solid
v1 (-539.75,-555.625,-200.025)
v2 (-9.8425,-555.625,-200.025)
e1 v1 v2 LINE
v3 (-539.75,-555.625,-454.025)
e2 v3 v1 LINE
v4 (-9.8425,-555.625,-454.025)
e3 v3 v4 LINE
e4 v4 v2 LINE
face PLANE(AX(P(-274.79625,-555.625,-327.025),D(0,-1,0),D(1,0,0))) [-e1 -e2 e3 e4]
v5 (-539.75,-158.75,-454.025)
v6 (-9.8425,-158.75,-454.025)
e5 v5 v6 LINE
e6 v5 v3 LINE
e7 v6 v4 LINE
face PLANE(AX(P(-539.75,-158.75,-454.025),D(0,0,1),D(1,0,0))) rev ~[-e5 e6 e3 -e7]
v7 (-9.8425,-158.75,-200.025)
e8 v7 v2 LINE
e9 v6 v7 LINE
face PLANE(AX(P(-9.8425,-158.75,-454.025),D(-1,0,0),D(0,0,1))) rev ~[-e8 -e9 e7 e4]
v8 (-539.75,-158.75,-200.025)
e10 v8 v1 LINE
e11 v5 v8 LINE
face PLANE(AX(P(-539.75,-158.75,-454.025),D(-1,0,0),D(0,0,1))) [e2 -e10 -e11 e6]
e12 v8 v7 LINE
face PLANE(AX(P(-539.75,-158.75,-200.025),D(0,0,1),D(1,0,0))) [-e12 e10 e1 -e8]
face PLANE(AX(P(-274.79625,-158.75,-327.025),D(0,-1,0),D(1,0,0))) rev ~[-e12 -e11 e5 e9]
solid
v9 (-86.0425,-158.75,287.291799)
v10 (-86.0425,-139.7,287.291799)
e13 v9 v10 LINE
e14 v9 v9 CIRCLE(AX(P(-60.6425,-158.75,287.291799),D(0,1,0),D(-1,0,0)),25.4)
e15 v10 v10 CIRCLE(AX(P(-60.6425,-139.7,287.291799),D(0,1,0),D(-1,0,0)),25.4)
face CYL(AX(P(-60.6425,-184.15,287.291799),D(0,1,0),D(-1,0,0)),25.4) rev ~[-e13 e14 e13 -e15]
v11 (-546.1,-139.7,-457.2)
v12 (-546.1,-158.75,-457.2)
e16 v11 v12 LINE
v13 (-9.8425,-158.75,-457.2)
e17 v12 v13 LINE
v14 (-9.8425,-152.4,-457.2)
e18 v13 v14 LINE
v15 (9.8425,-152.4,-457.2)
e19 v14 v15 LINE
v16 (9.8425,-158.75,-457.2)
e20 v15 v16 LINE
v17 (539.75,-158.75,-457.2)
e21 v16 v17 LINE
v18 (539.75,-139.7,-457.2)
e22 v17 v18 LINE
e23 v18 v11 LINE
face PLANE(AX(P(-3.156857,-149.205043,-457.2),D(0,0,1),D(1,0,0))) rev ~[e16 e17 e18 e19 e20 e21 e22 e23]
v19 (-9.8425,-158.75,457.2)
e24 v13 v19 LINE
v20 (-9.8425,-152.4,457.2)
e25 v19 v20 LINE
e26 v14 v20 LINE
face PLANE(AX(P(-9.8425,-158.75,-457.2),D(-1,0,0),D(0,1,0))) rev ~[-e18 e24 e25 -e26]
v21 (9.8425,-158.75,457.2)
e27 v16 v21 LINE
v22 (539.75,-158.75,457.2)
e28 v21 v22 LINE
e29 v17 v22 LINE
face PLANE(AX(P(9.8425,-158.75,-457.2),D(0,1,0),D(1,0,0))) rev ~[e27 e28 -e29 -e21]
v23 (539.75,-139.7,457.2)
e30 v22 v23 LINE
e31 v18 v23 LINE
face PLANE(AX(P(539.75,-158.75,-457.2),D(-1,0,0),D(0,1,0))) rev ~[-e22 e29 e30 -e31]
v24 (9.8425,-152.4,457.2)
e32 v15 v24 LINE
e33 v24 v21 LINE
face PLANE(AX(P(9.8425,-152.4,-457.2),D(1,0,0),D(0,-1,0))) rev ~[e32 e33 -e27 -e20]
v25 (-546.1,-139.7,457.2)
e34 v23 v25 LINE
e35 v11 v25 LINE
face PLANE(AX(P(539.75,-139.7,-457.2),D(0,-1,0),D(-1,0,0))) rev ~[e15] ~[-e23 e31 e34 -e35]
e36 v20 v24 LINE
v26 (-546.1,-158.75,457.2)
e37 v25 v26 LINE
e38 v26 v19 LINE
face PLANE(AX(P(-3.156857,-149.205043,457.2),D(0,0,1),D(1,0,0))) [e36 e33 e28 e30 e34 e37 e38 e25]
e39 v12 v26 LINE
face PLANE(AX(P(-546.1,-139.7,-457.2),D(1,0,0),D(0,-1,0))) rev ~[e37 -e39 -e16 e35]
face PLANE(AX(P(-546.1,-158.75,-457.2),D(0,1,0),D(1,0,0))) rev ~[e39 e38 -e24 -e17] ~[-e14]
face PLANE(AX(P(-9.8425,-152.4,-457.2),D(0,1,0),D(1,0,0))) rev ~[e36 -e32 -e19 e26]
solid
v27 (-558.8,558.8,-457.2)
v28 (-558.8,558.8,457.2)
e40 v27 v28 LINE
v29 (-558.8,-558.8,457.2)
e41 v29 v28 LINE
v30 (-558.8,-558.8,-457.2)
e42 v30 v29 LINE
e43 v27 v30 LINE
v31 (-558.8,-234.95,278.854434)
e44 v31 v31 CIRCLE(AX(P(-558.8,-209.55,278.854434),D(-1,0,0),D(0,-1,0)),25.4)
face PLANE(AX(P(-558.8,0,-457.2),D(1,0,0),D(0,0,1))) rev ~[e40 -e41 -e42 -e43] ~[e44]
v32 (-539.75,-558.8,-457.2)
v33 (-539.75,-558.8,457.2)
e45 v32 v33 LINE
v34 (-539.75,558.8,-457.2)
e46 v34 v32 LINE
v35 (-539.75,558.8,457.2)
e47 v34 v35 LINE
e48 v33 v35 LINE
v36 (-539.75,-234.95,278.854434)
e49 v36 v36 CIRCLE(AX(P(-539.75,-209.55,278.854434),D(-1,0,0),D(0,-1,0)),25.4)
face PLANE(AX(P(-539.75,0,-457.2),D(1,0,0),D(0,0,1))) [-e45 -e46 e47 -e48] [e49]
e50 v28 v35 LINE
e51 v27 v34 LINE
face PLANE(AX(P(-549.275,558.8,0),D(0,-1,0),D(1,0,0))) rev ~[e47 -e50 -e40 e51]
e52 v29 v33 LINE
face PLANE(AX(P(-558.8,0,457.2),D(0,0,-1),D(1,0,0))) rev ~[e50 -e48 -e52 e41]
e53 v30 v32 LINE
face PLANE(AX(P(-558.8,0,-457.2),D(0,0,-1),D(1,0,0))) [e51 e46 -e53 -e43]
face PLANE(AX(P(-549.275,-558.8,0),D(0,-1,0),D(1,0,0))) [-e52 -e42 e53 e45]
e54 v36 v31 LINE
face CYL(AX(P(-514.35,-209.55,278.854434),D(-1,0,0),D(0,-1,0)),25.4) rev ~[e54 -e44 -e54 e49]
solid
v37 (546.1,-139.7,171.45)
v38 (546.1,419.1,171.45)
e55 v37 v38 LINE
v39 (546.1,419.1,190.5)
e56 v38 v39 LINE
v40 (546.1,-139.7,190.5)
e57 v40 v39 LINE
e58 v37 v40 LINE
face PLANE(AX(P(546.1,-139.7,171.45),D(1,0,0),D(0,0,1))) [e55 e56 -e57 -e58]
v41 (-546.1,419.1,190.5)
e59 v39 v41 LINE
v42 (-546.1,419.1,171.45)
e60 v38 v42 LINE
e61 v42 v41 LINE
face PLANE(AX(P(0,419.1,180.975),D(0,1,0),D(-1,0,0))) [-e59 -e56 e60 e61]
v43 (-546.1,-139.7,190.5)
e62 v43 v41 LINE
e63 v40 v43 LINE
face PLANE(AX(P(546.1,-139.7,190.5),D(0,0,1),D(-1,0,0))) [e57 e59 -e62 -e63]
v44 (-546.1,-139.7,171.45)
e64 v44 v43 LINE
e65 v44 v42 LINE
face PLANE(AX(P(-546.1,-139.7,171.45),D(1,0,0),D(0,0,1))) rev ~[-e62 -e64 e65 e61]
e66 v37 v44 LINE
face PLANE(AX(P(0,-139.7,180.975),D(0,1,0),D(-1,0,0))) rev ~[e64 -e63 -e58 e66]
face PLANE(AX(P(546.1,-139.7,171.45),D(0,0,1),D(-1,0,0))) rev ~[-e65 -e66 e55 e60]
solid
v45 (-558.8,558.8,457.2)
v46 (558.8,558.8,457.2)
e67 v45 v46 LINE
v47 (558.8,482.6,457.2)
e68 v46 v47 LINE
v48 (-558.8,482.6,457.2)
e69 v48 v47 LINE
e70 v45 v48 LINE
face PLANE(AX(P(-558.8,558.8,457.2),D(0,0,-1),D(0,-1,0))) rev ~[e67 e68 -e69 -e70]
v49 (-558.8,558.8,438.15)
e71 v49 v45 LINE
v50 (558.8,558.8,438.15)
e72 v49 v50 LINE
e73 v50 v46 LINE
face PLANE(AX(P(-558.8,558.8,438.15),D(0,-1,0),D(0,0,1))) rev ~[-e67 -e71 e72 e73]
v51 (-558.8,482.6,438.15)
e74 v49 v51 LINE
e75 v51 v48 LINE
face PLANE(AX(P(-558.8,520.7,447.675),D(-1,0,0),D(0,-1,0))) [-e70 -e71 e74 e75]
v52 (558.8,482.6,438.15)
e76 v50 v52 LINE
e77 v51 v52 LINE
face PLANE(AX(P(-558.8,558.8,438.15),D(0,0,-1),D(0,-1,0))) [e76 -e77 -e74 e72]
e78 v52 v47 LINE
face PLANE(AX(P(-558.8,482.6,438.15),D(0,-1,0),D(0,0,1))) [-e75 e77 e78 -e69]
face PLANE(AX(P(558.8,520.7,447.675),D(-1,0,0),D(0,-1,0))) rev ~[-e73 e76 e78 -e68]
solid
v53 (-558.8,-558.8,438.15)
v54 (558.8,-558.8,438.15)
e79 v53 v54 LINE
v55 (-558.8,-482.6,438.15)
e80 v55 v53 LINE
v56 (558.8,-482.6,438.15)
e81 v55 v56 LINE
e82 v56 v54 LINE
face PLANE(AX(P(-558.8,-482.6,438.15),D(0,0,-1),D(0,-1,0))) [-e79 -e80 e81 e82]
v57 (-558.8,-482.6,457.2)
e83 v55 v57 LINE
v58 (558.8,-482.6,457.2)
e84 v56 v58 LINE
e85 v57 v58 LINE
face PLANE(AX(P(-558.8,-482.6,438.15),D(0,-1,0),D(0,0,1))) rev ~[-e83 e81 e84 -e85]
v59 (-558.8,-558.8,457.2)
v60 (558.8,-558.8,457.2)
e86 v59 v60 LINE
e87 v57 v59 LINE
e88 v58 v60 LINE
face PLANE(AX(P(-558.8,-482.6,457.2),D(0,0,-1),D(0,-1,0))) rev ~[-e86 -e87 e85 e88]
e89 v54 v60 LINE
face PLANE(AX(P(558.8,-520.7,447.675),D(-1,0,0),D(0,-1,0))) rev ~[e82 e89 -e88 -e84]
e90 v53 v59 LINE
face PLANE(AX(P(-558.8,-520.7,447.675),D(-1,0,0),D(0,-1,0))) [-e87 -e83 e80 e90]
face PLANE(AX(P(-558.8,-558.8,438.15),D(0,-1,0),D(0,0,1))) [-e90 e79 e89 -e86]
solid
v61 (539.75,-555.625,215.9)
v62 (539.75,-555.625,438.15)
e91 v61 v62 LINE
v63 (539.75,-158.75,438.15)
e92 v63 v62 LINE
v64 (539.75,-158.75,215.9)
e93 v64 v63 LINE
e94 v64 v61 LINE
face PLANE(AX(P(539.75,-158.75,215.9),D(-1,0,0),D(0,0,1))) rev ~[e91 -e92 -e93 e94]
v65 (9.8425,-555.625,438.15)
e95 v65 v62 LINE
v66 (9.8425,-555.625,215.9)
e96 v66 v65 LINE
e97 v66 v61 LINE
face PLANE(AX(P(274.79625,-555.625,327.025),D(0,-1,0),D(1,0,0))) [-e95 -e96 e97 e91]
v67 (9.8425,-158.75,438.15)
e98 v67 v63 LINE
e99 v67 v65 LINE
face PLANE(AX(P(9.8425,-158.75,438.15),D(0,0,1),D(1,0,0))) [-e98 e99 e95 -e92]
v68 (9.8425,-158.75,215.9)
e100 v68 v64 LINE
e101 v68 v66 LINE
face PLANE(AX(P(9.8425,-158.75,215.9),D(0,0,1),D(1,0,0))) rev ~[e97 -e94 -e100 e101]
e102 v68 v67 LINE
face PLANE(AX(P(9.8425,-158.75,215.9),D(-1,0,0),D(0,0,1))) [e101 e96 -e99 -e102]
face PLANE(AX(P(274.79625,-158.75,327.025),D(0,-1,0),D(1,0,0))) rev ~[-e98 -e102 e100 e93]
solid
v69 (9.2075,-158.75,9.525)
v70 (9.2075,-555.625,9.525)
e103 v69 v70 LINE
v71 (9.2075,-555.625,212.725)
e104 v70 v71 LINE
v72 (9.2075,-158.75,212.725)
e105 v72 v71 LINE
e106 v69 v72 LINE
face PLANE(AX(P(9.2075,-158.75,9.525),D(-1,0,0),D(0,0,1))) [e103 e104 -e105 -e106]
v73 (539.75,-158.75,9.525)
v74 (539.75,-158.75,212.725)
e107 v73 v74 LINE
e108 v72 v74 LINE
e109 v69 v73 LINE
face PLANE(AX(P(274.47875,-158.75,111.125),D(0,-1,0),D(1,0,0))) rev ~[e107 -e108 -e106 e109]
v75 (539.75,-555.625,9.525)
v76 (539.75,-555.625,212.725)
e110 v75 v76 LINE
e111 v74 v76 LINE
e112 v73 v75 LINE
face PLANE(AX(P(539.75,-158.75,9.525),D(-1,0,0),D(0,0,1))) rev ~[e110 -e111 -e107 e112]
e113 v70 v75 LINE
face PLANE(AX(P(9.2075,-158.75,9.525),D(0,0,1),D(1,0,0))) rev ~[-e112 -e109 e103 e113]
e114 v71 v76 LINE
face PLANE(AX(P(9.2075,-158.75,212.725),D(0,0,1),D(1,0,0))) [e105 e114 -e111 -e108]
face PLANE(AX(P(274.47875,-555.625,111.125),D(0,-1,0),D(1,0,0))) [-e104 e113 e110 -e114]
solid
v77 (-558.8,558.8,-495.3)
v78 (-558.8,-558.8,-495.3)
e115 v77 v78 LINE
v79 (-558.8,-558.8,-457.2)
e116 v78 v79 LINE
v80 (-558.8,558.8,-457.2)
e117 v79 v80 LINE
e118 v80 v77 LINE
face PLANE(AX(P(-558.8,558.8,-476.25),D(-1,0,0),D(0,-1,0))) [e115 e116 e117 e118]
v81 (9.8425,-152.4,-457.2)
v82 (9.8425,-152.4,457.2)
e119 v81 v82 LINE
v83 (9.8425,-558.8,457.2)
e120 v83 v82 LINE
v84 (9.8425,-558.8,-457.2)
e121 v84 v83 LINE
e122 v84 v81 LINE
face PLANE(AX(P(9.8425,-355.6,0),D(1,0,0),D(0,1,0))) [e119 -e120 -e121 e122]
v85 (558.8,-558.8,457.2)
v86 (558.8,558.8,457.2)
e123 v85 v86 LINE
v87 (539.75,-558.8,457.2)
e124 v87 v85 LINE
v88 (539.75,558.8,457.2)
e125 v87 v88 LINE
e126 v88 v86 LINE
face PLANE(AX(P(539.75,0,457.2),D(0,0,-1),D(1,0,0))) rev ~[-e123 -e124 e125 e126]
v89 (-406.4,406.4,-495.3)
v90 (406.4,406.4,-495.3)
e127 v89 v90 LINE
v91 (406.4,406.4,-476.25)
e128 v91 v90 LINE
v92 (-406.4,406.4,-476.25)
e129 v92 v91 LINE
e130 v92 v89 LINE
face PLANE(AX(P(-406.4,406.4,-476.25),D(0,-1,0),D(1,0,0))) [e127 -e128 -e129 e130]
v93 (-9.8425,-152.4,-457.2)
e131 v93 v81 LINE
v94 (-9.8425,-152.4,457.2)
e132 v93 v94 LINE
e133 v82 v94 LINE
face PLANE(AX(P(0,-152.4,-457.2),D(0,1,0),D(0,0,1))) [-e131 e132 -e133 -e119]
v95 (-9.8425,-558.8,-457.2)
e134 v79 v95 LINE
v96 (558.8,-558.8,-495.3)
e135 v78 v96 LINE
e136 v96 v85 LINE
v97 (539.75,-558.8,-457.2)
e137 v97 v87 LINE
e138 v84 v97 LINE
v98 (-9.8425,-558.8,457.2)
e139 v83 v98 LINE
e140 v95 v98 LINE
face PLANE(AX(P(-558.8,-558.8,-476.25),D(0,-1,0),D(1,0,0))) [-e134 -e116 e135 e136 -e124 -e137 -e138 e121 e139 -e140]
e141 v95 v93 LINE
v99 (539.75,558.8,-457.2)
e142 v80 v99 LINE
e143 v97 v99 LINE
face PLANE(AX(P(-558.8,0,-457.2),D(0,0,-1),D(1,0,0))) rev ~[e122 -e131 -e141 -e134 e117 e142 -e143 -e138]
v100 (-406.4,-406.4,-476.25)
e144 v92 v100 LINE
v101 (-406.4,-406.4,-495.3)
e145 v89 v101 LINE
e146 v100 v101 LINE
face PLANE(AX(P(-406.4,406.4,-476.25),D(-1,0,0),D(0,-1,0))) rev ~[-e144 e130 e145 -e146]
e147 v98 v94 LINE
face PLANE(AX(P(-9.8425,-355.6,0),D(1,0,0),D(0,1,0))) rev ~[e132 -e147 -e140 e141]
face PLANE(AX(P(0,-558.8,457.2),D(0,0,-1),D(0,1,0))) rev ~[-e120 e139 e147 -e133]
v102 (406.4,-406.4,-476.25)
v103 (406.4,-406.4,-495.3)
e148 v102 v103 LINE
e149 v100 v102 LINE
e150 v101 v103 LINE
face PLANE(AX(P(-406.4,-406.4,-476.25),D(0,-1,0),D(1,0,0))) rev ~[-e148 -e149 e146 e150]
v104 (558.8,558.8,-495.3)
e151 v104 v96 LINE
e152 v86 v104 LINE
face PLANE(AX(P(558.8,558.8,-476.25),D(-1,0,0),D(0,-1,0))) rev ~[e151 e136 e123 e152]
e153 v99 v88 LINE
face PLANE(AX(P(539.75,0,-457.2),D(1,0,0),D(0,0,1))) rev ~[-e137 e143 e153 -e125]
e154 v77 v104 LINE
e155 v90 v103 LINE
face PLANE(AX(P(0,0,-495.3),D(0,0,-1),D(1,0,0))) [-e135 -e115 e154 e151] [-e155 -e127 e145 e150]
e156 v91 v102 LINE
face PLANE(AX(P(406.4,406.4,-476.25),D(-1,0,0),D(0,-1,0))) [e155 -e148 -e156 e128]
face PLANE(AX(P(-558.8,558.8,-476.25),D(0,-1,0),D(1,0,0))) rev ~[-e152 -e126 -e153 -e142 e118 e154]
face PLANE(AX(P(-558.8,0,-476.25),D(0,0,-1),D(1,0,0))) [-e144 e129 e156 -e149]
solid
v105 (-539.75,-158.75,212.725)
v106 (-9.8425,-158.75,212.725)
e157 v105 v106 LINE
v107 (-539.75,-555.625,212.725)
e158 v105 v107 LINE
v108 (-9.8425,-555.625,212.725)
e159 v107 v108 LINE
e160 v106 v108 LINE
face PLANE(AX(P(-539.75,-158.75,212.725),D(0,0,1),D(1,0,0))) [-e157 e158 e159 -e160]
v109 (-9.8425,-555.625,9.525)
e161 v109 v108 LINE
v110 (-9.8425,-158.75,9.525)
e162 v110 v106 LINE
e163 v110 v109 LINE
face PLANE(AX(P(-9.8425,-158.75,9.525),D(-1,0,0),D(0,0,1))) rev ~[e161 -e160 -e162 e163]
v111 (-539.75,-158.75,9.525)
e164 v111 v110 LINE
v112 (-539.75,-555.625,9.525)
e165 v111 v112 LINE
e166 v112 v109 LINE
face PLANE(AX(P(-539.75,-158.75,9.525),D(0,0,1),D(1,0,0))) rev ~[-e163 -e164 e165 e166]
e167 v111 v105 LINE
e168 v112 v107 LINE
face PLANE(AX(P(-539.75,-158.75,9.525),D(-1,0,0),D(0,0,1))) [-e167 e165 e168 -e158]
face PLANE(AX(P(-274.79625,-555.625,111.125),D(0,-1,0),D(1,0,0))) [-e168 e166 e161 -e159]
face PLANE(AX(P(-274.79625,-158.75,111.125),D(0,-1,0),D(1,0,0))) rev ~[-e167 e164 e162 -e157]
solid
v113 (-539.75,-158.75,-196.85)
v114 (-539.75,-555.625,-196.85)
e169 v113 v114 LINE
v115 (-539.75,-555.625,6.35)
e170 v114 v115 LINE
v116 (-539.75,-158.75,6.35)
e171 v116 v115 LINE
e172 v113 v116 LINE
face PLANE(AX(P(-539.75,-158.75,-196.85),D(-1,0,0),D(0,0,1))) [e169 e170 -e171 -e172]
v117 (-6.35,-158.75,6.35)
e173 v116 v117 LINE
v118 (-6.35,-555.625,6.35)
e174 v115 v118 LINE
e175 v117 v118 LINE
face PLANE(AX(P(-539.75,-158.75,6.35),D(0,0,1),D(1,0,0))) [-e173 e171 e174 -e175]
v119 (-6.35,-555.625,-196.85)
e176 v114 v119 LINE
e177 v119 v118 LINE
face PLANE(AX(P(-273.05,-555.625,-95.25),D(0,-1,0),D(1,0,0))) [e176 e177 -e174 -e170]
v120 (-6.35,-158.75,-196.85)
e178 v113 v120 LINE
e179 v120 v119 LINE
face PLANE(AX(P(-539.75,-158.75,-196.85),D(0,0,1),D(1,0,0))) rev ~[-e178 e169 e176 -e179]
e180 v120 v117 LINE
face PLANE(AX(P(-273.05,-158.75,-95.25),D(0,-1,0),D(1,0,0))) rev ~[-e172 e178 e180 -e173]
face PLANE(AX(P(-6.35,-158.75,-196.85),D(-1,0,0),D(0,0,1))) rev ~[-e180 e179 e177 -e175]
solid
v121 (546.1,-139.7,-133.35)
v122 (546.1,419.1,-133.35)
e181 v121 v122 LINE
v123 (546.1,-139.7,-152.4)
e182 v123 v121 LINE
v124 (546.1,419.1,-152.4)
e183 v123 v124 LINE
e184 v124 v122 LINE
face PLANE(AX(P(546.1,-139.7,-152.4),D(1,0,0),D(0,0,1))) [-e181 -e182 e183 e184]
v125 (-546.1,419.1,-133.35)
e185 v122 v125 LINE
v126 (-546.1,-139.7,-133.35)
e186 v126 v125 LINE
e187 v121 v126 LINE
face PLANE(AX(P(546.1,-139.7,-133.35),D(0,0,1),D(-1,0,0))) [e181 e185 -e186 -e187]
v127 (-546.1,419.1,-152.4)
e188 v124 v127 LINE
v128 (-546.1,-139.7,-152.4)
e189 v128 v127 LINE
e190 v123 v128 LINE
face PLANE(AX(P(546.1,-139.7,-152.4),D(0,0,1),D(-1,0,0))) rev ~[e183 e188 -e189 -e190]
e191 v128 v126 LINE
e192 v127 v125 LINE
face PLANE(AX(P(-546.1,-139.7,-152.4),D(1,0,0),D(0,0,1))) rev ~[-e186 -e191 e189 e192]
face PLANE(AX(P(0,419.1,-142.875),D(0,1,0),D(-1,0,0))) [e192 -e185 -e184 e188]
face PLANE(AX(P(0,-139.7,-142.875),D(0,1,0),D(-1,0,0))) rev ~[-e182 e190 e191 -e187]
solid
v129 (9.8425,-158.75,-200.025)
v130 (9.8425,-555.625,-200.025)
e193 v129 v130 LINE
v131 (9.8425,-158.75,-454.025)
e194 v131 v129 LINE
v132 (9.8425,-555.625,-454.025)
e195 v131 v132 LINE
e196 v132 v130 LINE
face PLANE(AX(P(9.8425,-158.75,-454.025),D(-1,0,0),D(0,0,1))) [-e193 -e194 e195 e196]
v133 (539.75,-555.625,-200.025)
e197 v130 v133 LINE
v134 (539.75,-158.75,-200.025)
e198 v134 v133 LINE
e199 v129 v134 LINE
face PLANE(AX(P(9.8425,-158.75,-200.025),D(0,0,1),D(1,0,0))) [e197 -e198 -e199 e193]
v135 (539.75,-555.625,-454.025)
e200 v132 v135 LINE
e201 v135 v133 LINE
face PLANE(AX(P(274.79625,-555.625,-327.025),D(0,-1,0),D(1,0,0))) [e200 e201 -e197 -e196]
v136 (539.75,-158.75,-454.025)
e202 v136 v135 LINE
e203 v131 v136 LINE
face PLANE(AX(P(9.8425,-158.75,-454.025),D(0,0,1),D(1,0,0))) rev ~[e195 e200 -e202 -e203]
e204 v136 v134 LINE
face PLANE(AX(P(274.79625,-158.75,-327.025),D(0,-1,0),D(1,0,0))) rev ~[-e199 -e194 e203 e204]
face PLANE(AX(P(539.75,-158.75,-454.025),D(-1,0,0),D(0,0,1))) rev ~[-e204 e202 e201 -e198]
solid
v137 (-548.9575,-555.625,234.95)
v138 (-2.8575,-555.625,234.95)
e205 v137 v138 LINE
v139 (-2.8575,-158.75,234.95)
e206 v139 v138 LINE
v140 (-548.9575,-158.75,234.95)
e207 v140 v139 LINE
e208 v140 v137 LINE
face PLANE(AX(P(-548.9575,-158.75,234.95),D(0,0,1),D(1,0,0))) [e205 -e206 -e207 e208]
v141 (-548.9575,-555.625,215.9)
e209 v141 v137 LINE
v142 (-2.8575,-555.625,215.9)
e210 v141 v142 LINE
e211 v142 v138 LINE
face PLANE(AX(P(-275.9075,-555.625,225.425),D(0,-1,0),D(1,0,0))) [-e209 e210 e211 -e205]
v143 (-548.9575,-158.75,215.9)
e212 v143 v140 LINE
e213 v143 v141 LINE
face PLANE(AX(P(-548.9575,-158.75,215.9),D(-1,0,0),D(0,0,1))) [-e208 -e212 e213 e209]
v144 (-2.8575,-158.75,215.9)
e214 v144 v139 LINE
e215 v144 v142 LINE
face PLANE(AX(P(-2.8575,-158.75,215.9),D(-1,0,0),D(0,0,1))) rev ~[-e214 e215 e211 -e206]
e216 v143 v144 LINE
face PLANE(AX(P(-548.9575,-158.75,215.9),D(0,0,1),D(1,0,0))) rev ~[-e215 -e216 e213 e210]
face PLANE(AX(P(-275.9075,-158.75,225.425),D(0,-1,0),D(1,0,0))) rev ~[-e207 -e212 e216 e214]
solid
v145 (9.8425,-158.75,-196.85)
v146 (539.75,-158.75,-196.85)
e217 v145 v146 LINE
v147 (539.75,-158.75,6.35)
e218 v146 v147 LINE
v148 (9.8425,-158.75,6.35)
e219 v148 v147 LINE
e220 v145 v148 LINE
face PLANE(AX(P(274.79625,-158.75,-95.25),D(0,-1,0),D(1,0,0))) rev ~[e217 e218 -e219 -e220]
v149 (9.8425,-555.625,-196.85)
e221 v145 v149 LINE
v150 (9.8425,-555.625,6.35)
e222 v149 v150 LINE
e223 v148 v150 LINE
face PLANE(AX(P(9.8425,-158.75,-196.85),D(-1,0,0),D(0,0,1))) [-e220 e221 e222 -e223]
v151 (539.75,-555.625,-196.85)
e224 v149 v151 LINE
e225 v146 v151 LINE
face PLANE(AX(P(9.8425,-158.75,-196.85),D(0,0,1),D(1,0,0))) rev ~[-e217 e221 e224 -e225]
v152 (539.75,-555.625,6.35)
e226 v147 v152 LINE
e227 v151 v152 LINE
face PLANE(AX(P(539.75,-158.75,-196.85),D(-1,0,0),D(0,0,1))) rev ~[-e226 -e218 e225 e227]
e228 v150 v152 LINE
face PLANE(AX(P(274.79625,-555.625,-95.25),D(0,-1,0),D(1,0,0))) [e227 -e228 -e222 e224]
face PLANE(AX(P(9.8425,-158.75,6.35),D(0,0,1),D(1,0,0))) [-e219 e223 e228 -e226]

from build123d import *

# Parameters (mm, degrees)
F1_W          = 19.05
F1_H          = 914.4
F3_DEPTH      = 558.8
F3_DEPTH_BACK = 558.8
F2_W          = 19.05
F2_H          = 914.4
F4_DEPTH      = 558.8
F4_DEPTH_BACK = 558.8
F0_W          = 1117.6
F0_H          = 19.05
F5_DEPTH      = 558.8
F5_DEPTH_BACK = 558.8
F6_W          = 406.4
F6_H          = 914.4
F7_DEPTH      = 9.8425
F7_DEPTH_BACK = 9.8425
F8_W          = 76.2
F8_H          = 19.05
F9_DEPTH      = 1117.6
F11_DEPTH     = 914.4
F12_W         = 1117.6
F12_H         = 1117.6
F12_W_2       = 812.8
F12_H_2       = 812.8
F13_DEPTH     = 19.05
F14_W         = 546.1
F14_H         = 19.05
F15_DEPTH     = 396.875
F17_D         = 50.8
F17_DEPTH     = 25.4
F17_TIP       = 15.2618597233
F18_W         = 529.9075
F18_H         = 203.2
F19_DEPTH     = 396.875
F21_D         = 50.8
F21_DEPTH     = 25.4
F21_TIP       = 15.2618597233
F22_W         = 533.4
F22_H         = 203.2
F23_DEPTH     = 396.875
F24_W         = 529.9075
F24_H         = 254
F25_DEPTH     = 396.875
F24_H_2       = 203.2
F24_W_2       = 530.5425
F24_H_3       = 222.25
F26_W         = 1092.2
F26_H         = 19.05
F27_DEPTH     = 558.8


with BuildPart() as f3:
    # F1 (on Front) → F3 (new body, two sides)
    with BuildSketch(Plane.XZ) as f3_sk:
        with Locations((-549.275, 0)):
            Rectangle(F1_W, F1_H)
    extrude(amount=F3_DEPTH)
    extrude(f3_sk.sketch, amount=-F3_DEPTH_BACK)

    # F17
    with Locations(Plane.YZ.offset(-539.75)):
        with Locations((-209.55, 278.8544340611)):
            Hole(F17_D / 2, depth=F17_DEPTH)
            with Locations((0, 0, -(F17_DEPTH + F17_TIP / 2))):  # 118° drill point
                Cone(0, F17_D / 2, F17_TIP, mode=Mode.SUBTRACT)


with BuildPart() as f4:
    # F2 (on Front) → F4 (new body, two sides)
    with BuildSketch(Plane.XZ) as f4_sk:
        with Locations((549.275, 0)):
            Rectangle(F2_W, F2_H)
    extrude(amount=F4_DEPTH)
    extrude(f4_sk.sketch, amount=-F4_DEPTH_BACK)

    # F0 (on Front) → F5 (join, two sides)
    with BuildSketch(Plane.XZ) as f5_sk:
        with Locations((0, -466.725)):
            Rectangle(F0_W, F0_H)
    extrude(amount=F5_DEPTH)
    extrude(f5_sk.sketch, amount=-F5_DEPTH_BACK)

    # F6 (on Right) → F7 (join, two sides)
    with BuildSketch(Plane.YZ) as f7_sk:
        with Locations((-355.6, 0)):
            Rectangle(F6_W, F6_H)
    extrude(amount=F7_DEPTH)
    extrude(f7_sk.sketch, amount=-F7_DEPTH_BACK)

    # F12 (on face) → F13 (join)
    with BuildSketch(Plane(origin=(0, 0, -476.25), x_dir=(1, 0, 0), z_dir=(0, 0, -1))):
        Rectangle(F12_W, F12_H)
        Rectangle(F12_W_2, F12_H_2, mode=Mode.SUBTRACT)
    extrude(amount=F13_DEPTH)


with BuildPart() as f9:
    # F8 (on face) → F9 (new body)
    with BuildSketch(Plane(origin=(-558.8, 0, 0), x_dir=(0, -1, 0), z_dir=(-1, 0, 0))):
        with Locations((-520.7, 447.675)):
            Rectangle(F8_W, F8_H)
    extrude(amount=-F9_DEPTH)


with BuildPart() as f9b:
    # F8 (on face) → F9, piece 2 (new body)
    with BuildSketch(Plane(origin=(-558.8, 0, 0), x_dir=(0, -1, 0), z_dir=(-1, 0, 0))):
        with Locations((520.7, 447.675)):
            Rectangle(F8_W, F8_H)
    extrude(amount=-F9_DEPTH)


with BuildPart() as f11:
    # F10 (on face) → F11 (new body)
    with BuildSketch(Plane.XY.offset(-457.2)):
        Polygon((539.75, -139.7), (-546.1, -139.7), (-546.1, -158.75), (-9.8425, -158.75), (-9.8425, -152.4), (9.8425, -152.4), (9.8425, -158.75), (539.75, -158.75), align=None)
    extrude(amount=F11_DEPTH)

    # F21
    with Locations(Plane.XZ.offset(158.75)):
        with Locations((-60.6425, 287.2917993546)):
            Hole(F21_D / 2, depth=F21_DEPTH)
            with Locations((0, 0, -(F21_DEPTH + F21_TIP / 2))):  # 118° drill point
                Cone(0, F21_D / 2, F21_TIP, mode=Mode.SUBTRACT)


with BuildPart() as f15:
    # F14 (on face) → F15 (new body)
    with BuildSketch(Plane.XZ.offset(158.75)):
        with Locations((-275.9075, 225.425)):
            Rectangle(F14_W, F14_H)
    extrude(amount=F15_DEPTH)


with BuildPart() as f19:
    # F18 (on face) → F19 (new body)
    with BuildSketch(Plane.XZ.offset(158.75)):
        with Locations((-274.79625, 111.125)):
            Rectangle(F18_W, F18_H)
    extrude(amount=F19_DEPTH)


with BuildPart() as f23:
    # F22 (on face) → F23 (new body)
    with BuildSketch(Plane.XZ.offset(158.75)):
        with Locations((-273.05, -95.25)):
            Rectangle(F22_W, F22_H)
    extrude(amount=F23_DEPTH)


with BuildPart() as f25:
    # F24 (on face) → F25 (new body)
    with BuildSketch(Plane.XZ.offset(158.75)):
        with Locations((-274.79625, -327.025)):
            Rectangle(F24_W, F24_H)
    extrude(amount=F25_DEPTH)


with BuildPart() as f25b:
    # F24 (on face) → F25, piece 2 (new body)
    with BuildSketch(Plane.XZ.offset(158.75)):
        with Locations((274.79625, -327.025)):
            Rectangle(F24_W, F24_H)
    extrude(amount=F25_DEPTH)


with BuildPart() as f25c:
    # F24 (on face) → F25, piece 3 (new body)
    with BuildSketch(Plane.XZ.offset(158.75)):
        with Locations((274.79625, -95.25)):
            Rectangle(F24_W, F24_H_2)
    extrude(amount=F25_DEPTH)


with BuildPart() as f25d:
    # F24 (on face) → F25, piece 4 (new body)
    with BuildSketch(Plane.XZ.offset(158.75)):
        with Locations((274.47875, 111.125)):
            Rectangle(F24_W_2, F24_H_2)
    extrude(amount=F25_DEPTH)


with BuildPart() as f25e:
    # F24 (on face) → F25, piece 5 (new body)
    with BuildSketch(Plane.XZ.offset(158.75)):
        with Locations((274.79625, 327.025)):
            Rectangle(F24_W, F24_H_3)
    extrude(amount=F25_DEPTH)


with BuildPart() as f27:
    # F26 (on face) → F27 (new body)
    with BuildSketch(Plane(origin=(0, -139.7, 0), x_dir=(-1, 0, 0), z_dir=(0, 1, 0))):
        with Locations((0, 180.975)):
            Rectangle(F26_W, F26_H)
    extrude(amount=F27_DEPTH)


with BuildPart() as f27b:
    # F26 (on face) → F27, piece 2 (new body)
    with BuildSketch(Plane(origin=(0, -139.7, 0), x_dir=(-1, 0, 0), z_dir=(0, 1, 0))):
        with Locations((0, -142.875)):
            Rectangle(F26_W, F26_H)
    extrude(amount=F27_DEPTH)


solid = Compound([f3.part, f4.part, f9.part, f9b.part, f11.part, f15.part, f19.part, f23.part, f25.part, f25b.part, f25c.part, f25d.part, f25e.part, f27.part, f27b.part])
